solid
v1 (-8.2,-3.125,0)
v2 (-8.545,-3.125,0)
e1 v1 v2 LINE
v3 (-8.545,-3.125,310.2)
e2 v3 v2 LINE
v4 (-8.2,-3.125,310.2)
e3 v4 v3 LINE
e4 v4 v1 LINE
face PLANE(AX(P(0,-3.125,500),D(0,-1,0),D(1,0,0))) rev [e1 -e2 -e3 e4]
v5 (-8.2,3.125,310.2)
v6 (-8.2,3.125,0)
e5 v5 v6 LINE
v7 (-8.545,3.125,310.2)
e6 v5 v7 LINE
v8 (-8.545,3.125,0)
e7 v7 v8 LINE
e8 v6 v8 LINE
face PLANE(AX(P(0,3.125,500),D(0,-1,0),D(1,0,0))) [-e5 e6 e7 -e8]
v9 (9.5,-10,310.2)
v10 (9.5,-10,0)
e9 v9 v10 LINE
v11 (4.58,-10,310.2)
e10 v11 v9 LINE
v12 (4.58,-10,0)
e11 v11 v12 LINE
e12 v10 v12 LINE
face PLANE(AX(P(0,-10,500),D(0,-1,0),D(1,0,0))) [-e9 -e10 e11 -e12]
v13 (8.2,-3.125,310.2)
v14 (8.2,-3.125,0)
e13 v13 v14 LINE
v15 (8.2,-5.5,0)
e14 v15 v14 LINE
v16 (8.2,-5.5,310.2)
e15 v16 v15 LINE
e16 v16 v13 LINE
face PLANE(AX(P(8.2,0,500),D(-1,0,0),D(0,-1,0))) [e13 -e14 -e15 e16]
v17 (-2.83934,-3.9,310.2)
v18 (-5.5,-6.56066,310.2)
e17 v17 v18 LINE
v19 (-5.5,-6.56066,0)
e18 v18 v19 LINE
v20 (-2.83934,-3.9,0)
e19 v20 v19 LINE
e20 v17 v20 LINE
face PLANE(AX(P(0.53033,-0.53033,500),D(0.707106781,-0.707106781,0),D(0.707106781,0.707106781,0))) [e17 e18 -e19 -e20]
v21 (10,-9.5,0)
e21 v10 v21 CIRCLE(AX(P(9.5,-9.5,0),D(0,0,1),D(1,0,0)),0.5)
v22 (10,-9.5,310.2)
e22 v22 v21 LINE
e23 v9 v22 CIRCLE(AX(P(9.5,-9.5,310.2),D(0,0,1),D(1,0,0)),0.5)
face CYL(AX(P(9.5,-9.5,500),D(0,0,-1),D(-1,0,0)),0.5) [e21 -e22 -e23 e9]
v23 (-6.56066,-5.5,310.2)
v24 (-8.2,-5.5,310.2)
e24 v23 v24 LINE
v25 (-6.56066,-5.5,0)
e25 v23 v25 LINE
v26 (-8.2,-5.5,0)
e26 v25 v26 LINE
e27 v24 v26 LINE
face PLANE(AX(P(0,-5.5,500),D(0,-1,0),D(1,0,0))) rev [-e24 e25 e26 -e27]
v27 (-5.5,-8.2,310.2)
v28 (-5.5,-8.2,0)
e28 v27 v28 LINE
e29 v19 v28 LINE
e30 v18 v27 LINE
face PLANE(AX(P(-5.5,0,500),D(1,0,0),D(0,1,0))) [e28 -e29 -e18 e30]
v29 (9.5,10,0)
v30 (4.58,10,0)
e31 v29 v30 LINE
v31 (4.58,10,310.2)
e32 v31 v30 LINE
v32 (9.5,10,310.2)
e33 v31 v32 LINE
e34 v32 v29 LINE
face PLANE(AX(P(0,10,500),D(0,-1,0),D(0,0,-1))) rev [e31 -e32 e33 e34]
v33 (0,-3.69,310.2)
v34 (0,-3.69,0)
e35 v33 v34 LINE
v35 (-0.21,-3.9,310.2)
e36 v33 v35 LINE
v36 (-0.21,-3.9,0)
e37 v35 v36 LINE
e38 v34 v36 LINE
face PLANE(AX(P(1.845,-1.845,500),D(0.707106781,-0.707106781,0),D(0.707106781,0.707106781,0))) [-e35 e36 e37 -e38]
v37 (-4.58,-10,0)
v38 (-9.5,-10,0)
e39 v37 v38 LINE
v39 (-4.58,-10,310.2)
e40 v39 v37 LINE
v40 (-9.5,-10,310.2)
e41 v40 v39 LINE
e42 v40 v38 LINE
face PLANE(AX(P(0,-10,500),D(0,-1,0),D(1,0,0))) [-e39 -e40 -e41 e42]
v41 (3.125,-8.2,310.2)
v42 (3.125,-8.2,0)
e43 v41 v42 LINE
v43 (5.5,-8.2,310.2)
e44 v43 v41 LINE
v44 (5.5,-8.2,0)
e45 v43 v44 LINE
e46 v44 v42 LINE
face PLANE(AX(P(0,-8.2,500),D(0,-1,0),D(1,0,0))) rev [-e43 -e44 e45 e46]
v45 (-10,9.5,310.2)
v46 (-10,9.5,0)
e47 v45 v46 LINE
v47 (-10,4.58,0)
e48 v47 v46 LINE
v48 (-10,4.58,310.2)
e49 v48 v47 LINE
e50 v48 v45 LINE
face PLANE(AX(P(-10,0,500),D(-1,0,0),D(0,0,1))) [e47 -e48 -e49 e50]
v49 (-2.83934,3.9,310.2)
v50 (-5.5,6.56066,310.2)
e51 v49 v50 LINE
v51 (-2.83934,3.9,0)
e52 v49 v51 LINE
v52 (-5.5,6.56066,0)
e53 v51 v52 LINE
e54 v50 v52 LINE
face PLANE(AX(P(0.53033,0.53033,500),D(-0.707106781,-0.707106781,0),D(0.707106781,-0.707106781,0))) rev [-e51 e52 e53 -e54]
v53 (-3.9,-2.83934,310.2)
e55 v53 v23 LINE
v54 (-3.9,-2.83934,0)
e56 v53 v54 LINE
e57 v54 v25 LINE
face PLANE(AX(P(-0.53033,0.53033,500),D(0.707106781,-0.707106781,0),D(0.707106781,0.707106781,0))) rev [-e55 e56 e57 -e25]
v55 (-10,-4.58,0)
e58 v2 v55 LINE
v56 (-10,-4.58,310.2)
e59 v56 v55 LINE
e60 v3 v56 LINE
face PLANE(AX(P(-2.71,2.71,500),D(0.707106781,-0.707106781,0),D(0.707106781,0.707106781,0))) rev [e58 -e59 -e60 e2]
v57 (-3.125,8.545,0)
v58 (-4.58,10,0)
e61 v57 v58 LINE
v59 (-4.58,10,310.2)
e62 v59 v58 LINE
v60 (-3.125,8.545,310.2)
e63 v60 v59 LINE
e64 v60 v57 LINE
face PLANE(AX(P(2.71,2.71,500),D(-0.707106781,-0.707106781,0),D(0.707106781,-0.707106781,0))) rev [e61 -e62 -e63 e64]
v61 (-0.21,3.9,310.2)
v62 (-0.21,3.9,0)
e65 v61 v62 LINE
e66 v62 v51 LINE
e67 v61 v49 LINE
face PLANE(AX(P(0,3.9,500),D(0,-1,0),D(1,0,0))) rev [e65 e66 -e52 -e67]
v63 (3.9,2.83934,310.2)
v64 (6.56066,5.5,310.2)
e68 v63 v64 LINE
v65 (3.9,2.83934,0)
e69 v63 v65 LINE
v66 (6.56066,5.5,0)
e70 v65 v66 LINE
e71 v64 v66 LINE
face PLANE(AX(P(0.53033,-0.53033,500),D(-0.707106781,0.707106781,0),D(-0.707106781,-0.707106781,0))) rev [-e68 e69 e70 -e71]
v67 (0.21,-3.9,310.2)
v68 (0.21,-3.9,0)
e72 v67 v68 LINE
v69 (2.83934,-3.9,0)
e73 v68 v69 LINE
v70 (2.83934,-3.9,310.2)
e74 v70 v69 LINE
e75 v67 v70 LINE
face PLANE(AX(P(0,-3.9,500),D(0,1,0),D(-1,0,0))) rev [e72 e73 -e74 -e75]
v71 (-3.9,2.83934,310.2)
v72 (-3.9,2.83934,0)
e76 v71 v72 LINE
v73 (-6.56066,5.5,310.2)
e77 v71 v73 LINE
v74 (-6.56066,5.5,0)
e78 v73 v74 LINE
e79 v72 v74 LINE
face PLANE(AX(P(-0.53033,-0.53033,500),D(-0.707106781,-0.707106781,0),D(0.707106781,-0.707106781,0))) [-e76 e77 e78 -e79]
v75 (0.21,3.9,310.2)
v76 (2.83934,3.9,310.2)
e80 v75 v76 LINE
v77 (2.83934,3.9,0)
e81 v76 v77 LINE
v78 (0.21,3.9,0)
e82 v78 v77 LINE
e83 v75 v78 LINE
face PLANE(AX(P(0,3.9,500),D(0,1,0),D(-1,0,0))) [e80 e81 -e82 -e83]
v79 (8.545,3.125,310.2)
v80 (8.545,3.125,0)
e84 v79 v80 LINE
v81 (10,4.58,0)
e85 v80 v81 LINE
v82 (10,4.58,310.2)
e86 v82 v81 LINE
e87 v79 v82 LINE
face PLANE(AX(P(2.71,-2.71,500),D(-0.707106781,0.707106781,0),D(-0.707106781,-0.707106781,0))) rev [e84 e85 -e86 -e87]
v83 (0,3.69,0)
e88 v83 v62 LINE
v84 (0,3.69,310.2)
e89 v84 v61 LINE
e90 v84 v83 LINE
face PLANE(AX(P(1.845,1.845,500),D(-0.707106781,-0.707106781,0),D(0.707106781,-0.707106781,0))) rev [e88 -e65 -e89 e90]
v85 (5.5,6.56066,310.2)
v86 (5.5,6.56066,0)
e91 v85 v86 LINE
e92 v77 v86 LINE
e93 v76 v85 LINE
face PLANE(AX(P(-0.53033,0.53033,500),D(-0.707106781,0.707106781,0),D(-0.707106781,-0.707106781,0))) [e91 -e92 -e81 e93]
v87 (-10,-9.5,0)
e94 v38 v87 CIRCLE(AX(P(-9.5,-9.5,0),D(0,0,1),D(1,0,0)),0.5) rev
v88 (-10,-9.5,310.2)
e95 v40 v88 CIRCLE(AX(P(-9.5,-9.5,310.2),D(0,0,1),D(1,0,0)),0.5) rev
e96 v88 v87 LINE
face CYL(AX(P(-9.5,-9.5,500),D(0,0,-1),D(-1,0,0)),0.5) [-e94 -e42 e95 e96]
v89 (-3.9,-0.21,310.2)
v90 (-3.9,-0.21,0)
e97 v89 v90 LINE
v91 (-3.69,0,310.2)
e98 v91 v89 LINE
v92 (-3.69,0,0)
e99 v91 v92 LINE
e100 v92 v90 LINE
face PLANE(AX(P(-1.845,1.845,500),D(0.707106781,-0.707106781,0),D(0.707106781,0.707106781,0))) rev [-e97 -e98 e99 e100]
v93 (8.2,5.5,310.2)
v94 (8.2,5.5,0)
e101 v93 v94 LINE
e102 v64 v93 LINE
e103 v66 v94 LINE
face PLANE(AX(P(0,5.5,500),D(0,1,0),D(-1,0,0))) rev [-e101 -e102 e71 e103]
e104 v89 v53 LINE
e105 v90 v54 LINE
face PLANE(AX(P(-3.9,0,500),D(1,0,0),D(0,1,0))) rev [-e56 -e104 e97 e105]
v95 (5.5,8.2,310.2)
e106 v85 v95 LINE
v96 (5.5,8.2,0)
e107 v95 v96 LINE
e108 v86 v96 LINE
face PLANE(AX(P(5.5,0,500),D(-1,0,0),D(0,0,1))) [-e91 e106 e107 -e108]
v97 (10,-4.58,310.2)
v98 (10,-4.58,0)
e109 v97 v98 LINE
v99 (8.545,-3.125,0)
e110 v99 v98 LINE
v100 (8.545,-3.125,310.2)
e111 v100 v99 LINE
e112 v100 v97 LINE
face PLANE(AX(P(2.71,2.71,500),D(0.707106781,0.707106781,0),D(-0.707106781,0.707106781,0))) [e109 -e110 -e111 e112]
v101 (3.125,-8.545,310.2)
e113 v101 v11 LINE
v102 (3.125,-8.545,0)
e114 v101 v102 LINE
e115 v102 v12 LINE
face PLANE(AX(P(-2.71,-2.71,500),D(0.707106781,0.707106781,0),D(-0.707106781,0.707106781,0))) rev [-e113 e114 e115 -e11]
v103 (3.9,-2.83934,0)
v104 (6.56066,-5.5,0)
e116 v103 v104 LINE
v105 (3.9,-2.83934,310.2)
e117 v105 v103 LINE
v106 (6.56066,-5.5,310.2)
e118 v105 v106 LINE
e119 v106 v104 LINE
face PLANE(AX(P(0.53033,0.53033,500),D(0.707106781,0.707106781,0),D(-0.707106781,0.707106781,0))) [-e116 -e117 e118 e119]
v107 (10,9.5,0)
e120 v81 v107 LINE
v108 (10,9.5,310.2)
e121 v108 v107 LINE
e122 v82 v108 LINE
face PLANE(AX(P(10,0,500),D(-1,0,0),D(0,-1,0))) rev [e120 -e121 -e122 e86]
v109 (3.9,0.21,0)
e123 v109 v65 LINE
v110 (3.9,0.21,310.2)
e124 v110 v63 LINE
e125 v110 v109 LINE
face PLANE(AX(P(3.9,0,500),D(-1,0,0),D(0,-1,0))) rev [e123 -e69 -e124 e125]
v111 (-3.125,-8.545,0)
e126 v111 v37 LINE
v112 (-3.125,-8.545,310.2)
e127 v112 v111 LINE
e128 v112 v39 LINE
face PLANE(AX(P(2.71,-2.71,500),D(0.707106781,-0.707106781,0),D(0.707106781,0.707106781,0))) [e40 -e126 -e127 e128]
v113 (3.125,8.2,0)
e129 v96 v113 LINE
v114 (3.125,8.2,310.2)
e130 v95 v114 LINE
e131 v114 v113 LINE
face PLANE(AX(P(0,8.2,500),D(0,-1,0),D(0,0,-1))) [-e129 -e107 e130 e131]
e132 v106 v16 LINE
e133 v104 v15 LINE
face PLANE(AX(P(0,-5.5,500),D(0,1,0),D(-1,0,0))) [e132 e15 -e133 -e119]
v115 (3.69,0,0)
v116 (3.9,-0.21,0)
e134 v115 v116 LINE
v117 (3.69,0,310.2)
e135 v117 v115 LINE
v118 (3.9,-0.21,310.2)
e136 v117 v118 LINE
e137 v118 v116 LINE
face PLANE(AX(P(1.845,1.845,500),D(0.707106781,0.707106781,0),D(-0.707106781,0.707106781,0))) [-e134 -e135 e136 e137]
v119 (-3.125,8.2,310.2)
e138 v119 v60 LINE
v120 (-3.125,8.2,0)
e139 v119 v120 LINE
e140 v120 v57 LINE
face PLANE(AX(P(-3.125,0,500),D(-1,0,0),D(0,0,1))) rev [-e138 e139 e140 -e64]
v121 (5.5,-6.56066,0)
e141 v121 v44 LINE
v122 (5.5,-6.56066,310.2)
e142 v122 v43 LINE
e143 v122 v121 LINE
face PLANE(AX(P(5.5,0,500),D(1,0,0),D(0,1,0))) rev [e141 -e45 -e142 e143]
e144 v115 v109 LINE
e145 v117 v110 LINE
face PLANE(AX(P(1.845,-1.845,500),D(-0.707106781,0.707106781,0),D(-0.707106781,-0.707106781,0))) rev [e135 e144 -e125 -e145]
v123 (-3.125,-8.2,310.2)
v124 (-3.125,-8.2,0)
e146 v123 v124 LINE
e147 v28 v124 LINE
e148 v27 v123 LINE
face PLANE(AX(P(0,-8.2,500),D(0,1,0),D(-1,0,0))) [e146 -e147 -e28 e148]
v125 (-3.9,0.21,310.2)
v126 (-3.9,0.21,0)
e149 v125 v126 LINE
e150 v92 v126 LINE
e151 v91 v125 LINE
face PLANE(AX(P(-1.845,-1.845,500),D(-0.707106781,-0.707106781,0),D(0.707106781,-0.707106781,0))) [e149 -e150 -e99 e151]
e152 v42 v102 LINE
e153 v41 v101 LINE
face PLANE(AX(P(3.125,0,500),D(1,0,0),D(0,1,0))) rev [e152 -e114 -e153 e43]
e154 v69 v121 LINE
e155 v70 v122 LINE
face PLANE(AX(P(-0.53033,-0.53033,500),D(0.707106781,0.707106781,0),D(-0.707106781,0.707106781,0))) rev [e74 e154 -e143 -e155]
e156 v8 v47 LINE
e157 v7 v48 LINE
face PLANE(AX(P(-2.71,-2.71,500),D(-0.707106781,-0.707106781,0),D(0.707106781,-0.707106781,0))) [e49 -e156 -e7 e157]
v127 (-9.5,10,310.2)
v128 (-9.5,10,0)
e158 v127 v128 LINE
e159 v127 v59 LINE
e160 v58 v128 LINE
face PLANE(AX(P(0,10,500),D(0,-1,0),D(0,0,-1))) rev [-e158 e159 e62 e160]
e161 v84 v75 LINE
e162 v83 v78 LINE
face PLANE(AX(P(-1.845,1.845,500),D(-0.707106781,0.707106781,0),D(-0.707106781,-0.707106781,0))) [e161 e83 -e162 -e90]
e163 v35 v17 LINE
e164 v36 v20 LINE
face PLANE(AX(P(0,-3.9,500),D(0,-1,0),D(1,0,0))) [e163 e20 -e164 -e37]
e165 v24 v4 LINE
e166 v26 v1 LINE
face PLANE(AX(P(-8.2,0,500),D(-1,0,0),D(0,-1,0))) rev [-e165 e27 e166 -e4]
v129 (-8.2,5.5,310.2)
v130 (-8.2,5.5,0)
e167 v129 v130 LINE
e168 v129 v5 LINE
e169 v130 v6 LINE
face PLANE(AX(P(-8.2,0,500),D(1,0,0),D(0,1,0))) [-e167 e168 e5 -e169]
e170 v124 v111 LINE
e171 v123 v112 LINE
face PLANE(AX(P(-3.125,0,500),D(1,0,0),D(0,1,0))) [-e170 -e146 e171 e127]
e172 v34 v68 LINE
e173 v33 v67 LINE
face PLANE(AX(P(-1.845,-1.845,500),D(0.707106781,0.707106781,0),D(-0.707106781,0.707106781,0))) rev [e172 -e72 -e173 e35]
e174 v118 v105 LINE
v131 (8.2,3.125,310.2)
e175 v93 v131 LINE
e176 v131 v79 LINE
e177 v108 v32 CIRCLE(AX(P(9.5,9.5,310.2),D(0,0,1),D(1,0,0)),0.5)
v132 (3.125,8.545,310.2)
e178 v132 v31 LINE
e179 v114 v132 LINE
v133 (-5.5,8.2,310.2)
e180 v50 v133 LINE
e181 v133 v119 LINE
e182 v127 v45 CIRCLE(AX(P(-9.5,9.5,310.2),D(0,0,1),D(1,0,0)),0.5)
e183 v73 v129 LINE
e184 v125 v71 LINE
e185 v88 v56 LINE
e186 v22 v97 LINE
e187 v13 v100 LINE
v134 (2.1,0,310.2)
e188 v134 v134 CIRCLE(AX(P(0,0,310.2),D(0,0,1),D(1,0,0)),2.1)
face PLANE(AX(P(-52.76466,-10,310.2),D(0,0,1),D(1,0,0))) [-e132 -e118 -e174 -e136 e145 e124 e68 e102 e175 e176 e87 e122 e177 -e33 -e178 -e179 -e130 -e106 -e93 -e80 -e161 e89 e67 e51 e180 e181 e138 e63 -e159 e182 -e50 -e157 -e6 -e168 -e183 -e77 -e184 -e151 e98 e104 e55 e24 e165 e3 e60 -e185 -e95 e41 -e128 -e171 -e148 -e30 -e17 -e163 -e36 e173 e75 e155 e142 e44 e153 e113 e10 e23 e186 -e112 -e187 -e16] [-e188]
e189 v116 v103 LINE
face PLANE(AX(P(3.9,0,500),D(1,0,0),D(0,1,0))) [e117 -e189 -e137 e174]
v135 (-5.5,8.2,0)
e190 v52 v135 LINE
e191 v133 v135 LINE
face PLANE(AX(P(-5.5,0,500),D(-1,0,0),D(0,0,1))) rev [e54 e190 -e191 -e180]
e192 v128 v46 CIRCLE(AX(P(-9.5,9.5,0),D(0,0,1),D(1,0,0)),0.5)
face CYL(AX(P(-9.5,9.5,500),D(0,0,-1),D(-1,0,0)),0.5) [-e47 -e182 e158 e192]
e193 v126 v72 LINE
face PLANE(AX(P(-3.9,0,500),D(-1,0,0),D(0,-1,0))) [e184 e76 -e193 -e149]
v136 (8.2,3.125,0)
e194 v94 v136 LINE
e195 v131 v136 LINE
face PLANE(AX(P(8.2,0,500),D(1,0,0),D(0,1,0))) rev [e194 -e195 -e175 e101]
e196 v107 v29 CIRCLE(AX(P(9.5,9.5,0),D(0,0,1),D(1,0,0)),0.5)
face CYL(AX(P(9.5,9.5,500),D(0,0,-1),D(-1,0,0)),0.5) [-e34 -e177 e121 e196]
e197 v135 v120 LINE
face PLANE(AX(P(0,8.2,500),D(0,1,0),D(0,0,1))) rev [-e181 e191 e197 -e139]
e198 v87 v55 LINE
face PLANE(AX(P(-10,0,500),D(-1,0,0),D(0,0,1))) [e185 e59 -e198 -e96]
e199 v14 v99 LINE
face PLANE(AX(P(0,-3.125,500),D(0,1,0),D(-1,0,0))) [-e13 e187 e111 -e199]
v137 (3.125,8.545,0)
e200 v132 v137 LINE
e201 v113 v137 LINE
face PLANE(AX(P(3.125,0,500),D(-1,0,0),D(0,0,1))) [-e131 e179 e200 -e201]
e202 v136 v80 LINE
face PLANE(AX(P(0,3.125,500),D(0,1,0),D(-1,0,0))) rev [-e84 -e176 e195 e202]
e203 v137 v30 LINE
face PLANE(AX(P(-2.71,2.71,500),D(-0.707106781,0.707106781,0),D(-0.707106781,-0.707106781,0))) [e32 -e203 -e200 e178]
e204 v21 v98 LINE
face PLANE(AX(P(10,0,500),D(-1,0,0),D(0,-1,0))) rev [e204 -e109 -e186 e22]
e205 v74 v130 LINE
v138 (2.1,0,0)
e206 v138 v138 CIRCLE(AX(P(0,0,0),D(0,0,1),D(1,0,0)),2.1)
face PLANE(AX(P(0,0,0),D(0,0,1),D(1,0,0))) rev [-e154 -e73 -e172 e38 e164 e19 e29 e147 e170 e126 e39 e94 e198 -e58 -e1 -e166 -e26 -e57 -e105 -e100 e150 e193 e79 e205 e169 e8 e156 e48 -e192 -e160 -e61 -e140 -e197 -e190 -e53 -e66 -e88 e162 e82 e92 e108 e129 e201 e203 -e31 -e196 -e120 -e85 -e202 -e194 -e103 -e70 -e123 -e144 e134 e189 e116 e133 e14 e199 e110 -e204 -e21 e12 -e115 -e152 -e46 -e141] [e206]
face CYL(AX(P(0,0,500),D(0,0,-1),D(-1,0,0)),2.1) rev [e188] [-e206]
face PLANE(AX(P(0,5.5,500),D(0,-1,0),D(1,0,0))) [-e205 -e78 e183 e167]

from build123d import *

# Parameters (mm, degrees)
V_SLOT_20X20X500_LINEAR_RAIL_BOSS_2_R        = 2.1
V_SLOT_20X20X500_LINEAR_RAIL_BOSS_EXTR_DEPTH = 500
CUT_EXTRUDE1_DEPTH                           = 501.199960016
CUT_EXTRUDE1_DEPTH_BACK                      = 501.199960016
SKETCH1_OUTSIDE_W                            = 122.16
SKETCH1_OUTSIDE_H                            = 602.16
SKETCH1_OUTSIDE_W_2                          = 105.529320626
SKETCH1_OUTSIDE_H_2                          = 310.200000001


# Read off the part's stored shape, not the designer's step: <V-Slot 20x20x500 Linear Rail>-<Boss-Extrude1>
with BuildPart() as part:
    # V-Slot 20x20x500 Linear Rail_-_Boss- 2 → <V-Slot 20x20x500 Linear Rail>-<Boss-Extrude1> (new body)
    with BuildSketch(Plane.XY):
        with BuildLine():
            Line((3.9, -2.839339828), (3.9, -0.21))
            Line((3.9, -0.21), (3.69, 0))
            Line((3.69, 0), (3.9, 0.21))
            Line((3.9, 0.21), (3.9, 2.839339828))
            Line((3.9, 2.839339828), (6.560660172, 5.5))
            Line((6.560660172, 5.5), (8.2, 5.5))
            Line((8.2, 5.5), (8.2, 3.125))
            Line((8.2, 3.125), (8.545, 3.125))
            Line((8.545, 3.125), (10, 4.58))
            Line((10, 4.58), (10, 9.5))
            ThreePointArc((10, 9.5), (9.853553391, 9.853553391), (9.5, 10))
            Line((9.5, 10), (4.58, 10))
            Line((4.58, 10), (3.125, 8.545))
            Line((3.125, 8.545), (3.125, 8.2))
            Line((3.125, 8.2), (5.5, 8.2))
            Line((5.5, 8.2), (5.5, 6.560660172))
            Line((5.5, 6.560660172), (2.839339828, 3.9))
            Line((2.839339828, 3.9), (0.21, 3.9))
            Line((0.21, 3.9), (0, 3.69))
            Line((0, 3.69), (-0.21, 3.9))
            Line((-0.21, 3.9), (-2.839339828, 3.9))
            Line((-2.839339828, 3.9), (-5.5, 6.560660172))
            Line((-5.5, 6.560660172), (-5.5, 8.2))
            Line((-5.5, 8.2), (-3.125, 8.2))
            Line((-3.125, 8.2), (-3.125, 8.545))
            Line((-3.125, 8.545), (-4.58, 10))
            Line((-4.58, 10), (-9.5, 10))
            ThreePointArc((-9.5, 10), (-9.853553391, 9.853553391), (-10, 9.5))
            Line((-10, 9.5), (-10, 4.58))
            Line((-10, 4.58), (-8.545, 3.125))
            Line((-8.545, 3.125), (-8.2, 3.125))
            Line((-8.2, 3.125), (-8.2, 5.5))
            Line((-8.2, 5.5), (-6.560660172, 5.5))
            Line((-6.560660172, 5.5), (-3.9, 2.839339828))
            Line((-3.9, 2.839339828), (-3.9, 0.21))
            Line((-3.9, 0.21), (-3.69, 0))
            Line((-3.69, 0), (-3.9, -0.21))
            Line((-3.9, -0.21), (-3.9, -2.839339828))
            Line((-3.9, -2.839339828), (-6.560660172, -5.5))
            Line((-6.560660172, -5.5), (-8.2, -5.5))
            Line((-8.2, -5.5), (-8.2, -3.125))
            Line((-8.2, -3.125), (-8.545, -3.125))
            Line((-8.545, -3.125), (-10, -4.58))
            Line((-10, -4.58), (-10, -9.5))
            ThreePointArc((-10, -9.5), (-9.853553391, -9.853553391), (-9.5, -10))
            Line((-9.5, -10), (-4.58, -10))
            Line((-4.58, -10), (-3.125, -8.545))
            Line((-3.125, -8.545), (-3.125, -8.2))
            Line((-3.125, -8.2), (-5.5, -8.2))
            Line((-5.5, -8.2), (-5.5, -6.560660172))
            Line((-5.5, -6.560660172), (-2.839339828, -3.9))
            Line((-2.839339828, -3.9), (-0.21, -3.9))
            Line((-0.21, -3.9), (0, -3.69))
            Line((0, -3.69), (0.21, -3.9))
            Line((0.21, -3.9), (2.839339828, -3.9))
            Line((2.839339828, -3.9), (5.5, -6.560660172))
            Line((5.5, -6.560660172), (5.5, -8.2))
            Line((5.5, -8.2), (3.125, -8.2))
            Line((3.125, -8.2), (3.125, -8.545))
            Line((3.125, -8.545), (4.58, -10))
            Line((4.58, -10), (9.5, -10))
            ThreePointArc((9.5, -10), (9.853553391, -9.853553391), (10, -9.5))
            Line((10, -9.5), (10, -4.58))
            Line((10, -4.58), (8.545, -3.125))
            Line((8.545, -3.125), (8.2, -3.125))
            Line((8.2, -3.125), (8.2, -5.5))
            Line((8.2, -5.5), (6.560660172, -5.5))
            Line((6.560660172, -5.5), (3.9, -2.839339828))
        make_face()
        Circle(V_SLOT_20X20X500_LINEAR_RAIL_BOSS_2_R, mode=Mode.SUBTRACT)
    extrude(amount=V_SLOT_20X20X500_LINEAR_RAIL_BOSS_EXTR_DEPTH)

    # Sketch1 outside → Cut-Extrude1 (cut, two sides: drawn at the far end of the back side and taken through both)
    with BuildSketch(Plane(origin=(0, 0, 0), x_dir=(1, 0, 0), z_dir=(0, 1, 0)).offset(-CUT_EXTRUDE1_DEPTH_BACK)):
        with Locations((0, -250)):
            Rectangle(SKETCH1_OUTSIDE_W, SKETCH1_OUTSIDE_H)
        with Locations((0, -155.100000001)):
            Rectangle(SKETCH1_OUTSIDE_W_2, SKETCH1_OUTSIDE_H_2, mode=Mode.SUBTRACT)
    extrude(amount=CUT_EXTRUDE1_DEPTH + CUT_EXTRUDE1_DEPTH_BACK, mode=Mode.SUBTRACT)


solid = part.part
